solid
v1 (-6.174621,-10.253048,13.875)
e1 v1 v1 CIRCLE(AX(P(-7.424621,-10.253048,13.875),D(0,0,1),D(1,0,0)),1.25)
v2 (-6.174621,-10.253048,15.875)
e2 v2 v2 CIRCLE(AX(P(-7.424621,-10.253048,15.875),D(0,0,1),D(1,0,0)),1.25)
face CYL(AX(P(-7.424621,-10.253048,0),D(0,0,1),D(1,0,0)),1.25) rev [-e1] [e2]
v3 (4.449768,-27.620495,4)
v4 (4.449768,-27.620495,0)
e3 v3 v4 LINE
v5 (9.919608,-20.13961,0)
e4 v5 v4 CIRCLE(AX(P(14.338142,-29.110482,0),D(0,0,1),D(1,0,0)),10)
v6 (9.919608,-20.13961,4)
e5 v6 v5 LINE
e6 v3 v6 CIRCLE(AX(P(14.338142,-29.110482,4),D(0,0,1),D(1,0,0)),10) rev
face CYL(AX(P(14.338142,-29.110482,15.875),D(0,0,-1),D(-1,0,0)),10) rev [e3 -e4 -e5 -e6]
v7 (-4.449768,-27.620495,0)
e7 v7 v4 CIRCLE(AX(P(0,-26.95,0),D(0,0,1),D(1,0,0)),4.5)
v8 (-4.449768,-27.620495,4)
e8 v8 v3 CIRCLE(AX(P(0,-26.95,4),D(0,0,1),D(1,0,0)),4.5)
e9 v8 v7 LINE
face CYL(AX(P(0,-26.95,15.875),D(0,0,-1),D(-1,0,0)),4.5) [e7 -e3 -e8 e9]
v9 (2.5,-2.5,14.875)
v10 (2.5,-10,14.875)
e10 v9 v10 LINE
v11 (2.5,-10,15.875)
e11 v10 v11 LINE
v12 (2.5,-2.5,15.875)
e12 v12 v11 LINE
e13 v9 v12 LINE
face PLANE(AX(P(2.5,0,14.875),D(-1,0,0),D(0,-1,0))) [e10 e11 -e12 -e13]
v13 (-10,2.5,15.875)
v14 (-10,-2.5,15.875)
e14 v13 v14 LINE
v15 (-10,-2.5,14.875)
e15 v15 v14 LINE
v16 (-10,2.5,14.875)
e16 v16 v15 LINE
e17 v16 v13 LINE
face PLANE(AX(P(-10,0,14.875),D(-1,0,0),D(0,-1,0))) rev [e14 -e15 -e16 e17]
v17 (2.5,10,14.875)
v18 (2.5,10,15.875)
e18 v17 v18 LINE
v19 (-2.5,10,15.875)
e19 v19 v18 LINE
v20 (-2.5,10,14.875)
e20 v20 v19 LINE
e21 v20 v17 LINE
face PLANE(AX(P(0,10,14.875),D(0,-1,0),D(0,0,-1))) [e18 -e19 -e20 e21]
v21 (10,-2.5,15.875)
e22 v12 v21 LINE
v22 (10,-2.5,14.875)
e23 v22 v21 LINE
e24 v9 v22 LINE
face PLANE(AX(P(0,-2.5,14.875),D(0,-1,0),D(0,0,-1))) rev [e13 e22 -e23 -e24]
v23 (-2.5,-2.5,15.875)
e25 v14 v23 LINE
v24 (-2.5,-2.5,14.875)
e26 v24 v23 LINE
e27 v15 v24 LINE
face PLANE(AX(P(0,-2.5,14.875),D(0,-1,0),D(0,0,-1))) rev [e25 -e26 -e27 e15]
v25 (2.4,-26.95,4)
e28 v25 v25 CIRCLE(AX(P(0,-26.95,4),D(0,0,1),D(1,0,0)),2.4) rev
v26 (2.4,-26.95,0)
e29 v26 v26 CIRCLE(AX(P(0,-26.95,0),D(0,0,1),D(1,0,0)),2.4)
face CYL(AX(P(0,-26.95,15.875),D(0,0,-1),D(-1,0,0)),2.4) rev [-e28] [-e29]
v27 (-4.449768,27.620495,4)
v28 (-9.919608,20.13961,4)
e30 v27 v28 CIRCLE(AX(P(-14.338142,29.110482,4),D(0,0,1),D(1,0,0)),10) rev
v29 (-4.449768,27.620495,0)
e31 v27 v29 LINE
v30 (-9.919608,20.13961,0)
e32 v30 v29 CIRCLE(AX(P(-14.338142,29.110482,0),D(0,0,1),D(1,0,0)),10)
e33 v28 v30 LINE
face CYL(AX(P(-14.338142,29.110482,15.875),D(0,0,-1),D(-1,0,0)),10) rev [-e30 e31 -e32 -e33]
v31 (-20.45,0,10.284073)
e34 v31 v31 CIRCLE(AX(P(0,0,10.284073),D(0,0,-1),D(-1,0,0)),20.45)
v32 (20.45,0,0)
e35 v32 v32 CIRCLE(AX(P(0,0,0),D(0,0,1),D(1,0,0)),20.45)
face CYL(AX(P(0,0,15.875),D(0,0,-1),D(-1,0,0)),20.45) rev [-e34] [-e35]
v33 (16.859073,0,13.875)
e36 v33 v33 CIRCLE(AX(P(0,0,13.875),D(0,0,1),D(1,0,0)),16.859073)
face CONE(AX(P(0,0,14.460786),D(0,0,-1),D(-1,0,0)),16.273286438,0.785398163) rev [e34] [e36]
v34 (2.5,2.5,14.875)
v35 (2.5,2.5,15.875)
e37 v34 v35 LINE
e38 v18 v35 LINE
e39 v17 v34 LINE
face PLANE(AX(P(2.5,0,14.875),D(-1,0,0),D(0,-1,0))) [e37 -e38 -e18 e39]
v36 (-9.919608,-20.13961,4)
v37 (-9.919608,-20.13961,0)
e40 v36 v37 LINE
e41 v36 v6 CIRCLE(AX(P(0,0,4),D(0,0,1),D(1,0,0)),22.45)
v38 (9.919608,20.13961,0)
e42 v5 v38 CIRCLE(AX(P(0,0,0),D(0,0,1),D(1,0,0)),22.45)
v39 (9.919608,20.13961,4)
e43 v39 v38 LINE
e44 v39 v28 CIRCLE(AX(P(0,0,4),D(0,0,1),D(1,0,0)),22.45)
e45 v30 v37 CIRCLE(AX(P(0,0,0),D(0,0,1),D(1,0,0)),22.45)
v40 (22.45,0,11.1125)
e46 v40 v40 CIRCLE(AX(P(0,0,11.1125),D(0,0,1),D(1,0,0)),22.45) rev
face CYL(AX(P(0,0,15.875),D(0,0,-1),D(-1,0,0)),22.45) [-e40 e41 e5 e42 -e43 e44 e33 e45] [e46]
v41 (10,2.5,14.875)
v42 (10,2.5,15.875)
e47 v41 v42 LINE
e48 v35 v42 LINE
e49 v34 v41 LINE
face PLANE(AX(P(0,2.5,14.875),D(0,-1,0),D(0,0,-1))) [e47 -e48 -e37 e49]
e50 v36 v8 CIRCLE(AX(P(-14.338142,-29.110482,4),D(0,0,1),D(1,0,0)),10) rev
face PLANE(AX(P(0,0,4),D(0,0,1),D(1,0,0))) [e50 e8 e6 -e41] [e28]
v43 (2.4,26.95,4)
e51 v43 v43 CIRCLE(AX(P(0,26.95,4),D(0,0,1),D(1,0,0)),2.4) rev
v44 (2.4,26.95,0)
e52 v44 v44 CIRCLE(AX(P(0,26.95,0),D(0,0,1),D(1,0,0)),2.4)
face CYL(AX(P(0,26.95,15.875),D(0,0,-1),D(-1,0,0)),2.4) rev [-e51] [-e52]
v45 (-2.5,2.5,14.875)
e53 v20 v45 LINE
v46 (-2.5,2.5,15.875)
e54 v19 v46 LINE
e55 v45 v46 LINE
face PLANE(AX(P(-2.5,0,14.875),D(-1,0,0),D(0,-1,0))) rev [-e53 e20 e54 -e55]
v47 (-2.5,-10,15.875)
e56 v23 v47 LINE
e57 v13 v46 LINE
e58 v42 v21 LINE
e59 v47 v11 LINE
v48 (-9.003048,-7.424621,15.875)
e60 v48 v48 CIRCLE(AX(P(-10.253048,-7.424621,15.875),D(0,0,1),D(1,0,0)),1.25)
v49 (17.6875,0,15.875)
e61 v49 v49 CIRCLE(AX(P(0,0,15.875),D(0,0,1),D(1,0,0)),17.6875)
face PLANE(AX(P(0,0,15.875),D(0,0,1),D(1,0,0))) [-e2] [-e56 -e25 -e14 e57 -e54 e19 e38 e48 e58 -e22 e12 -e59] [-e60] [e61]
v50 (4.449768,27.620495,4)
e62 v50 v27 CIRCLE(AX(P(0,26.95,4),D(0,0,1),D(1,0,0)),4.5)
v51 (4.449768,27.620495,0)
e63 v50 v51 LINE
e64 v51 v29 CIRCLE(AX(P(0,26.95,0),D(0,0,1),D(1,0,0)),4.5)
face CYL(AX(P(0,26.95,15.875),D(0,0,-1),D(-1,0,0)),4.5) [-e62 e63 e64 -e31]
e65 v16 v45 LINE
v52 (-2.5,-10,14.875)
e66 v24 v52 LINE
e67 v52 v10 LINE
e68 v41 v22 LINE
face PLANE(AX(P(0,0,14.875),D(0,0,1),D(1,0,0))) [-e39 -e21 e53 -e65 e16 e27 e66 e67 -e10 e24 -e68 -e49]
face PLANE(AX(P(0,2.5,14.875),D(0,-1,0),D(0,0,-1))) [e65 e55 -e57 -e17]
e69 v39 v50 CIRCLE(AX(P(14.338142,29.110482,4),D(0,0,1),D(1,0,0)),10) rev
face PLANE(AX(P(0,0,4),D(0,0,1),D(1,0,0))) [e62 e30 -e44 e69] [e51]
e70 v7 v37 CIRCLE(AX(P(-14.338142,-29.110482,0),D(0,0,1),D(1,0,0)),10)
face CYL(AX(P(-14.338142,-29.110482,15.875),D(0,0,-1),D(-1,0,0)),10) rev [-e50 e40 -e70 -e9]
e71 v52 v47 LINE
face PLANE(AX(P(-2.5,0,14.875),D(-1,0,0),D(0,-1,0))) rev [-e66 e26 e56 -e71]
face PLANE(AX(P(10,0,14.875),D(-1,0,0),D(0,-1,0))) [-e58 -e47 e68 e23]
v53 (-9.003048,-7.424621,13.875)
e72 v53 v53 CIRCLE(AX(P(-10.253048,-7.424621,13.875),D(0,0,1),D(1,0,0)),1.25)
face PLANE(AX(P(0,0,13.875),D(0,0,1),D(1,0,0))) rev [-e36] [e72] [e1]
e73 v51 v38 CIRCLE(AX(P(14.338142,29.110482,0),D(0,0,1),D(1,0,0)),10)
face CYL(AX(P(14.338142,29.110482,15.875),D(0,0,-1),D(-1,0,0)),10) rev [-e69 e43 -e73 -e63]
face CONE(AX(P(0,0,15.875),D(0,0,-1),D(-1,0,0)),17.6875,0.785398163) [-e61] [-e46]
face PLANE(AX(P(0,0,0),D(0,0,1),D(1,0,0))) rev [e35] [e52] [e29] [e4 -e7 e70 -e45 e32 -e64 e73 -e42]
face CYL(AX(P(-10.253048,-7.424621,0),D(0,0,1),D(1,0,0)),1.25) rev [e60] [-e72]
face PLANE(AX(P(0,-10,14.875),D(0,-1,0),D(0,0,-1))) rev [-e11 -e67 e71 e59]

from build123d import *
from build123d.topology import SkipClean

# Parameters (mm, degrees)
SKETCH1_R           = 2.4
BOSS_EXTRUDE1_DEPTH = 15.875
CUT_EXTRUDE11_START = -11.875
SKETCH13_R          = 2.4
CUT_EXTRUDE11_DEPTH = 11.875
CHAMFER1_SIZE       = 4.7625
SHELL1_OUTLINE_R    = 20.45
SHELL1_DEPTH        = 10.284072775
SHELL1_2_DEPTH      = 2
BOSS_EXTRUDE2_START = 2
BOSS_EXTRUDE2_DEPTH = 2
SKETCH15_W          = 7.5
SKETCH15_H          = 5
SKETCH15_W_2        = 5
SKETCH15_H_2        = 7.5
CUT_EXTRUDE12_DEPTH = 1
SKETCH16_R          = 1.25
CUT_EXTRUDE13_DEPTH = 42.774640932


with BuildPart() as part:
    # Sketch1 → Boss-Extrude1 (new body)
    # profile 1 of 3: a face of its own
    with BuildSketch(Plane.XY):
        with BuildLine():
            ThreePointArc((9.919608253, -20.139609532), (13.072195817, -18.251580659), (15.874547238, -15.874547238))
            Line((15.874547238, -15.874547238), (14.460333675, -14.460333675))
            ThreePointArc((14.460333675, -14.460333675), (-14.460333675, -14.460333675), (-14.460333675, 14.460333675))
            Line((-14.460333675, 14.460333675), (-15.874547238, 15.874547238))
            ThreePointArc((-15.874547238, 15.874547238), (-22.149254758, -3.662378144), (-9.919608253, -20.139609532))
            ThreePointArc((-9.919608253, -20.139609532), (-6.265793461, -23.208178662), (-4.449768206, -27.62049453))
            ThreePointArc((-4.449768206, -27.62049453), (0, -31.45), (4.449768206, -27.62049453))
            ThreePointArc((4.449768206, -27.62049453), (6.265793461, -23.208178662), (9.919608253, -20.139609532))
        make_face()
        with Locations((0, -26.95)):
            Circle(SKETCH1_R, mode=Mode.SUBTRACT)
    # profile 2 of 3: a face of its own
    with BuildSketch(Plane.XY):
        with BuildLine():
            Line((14.460333675, -14.460333675), (15.874547238, -15.874547238))
            ThreePointArc((15.874547238, -15.874547238), (22.149254758, 3.662378144), (9.919608253, 20.139609532))
            ThreePointArc((9.919608253, 20.139609532), (6.265793461, 23.208178662), (4.449768206, 27.62049453))
            ThreePointArc((4.449768206, 27.62049453), (0, 31.45), (-4.449768206, 27.62049453))
            ThreePointArc((-4.449768206, 27.62049453), (-6.265793461, 23.208178662), (-9.919608253, 20.139609532))
            ThreePointArc((-9.919608253, 20.139609532), (-13.072195817, 18.251580659), (-15.874547238, 15.874547238))
            Line((-15.874547238, 15.874547238), (-14.460333675, 14.460333675))
            ThreePointArc((-14.460333675, 14.460333675), (14.460333675, 14.460333675), (14.460333675, -14.460333675))
        make_face()
        with Locations((0, 26.95)):
            Circle(SKETCH1_R, mode=Mode.SUBTRACT)
    # profile 3 of 3: a face of its own
    with BuildSketch(Plane.XY):
        with BuildLine():
            ThreePointArc((-14.460333675, 14.460333675), (-14.460333675, -14.460333675), (14.460333675, -14.460333675))
            ThreePointArc((14.460333675, -14.460333675), (14.460333675, 14.460333675), (-14.460333675, 14.460333675))
        make_face()
    extrude(amount=BOSS_EXTRUDE1_DEPTH)

    # Sketch13 → Cut-Extrude11 (cut)
    # profile 1 of 2: a face of its own
    with SkipClean():  # the faces are left unmerged after this step: merging them gives an invalid solid
        with BuildSketch(Plane.XY.offset(15.875).offset(CUT_EXTRUDE11_START)):
            with BuildLine():
                ThreePointArc((4.449768206, -27.62049453), (6.265793461, -23.208178662), (9.919608253, -20.139609532))
                ThreePointArc((9.919608253, -20.139609532), (0, -22.45), (-9.919608253, -20.139609532))
                ThreePointArc((-9.919608253, -20.139609532), (-6.265793461, -23.208178662), (-4.449768206, -27.62049453))
                ThreePointArc((-4.449768206, -27.62049453), (0, -31.45), (4.449768206, -27.62049453))
            make_face()
            with Locations((0, -26.95)):
                Circle(SKETCH13_R, mode=Mode.SUBTRACT)
        # profile 2 of 2: a face of its own
        with BuildSketch(Plane.XY.offset(15.875).offset(CUT_EXTRUDE11_START)):
            with BuildLine():
                ThreePointArc((-9.919608253, 20.139609532), (0, 22.45), (9.919608253, 20.139609532))
                ThreePointArc((9.919608253, 20.139609532), (6.265793461, 23.208178662), (4.449768206, 27.62049453))
                ThreePointArc((4.449768206, 27.62049453), (0, 31.45), (-4.449768206, 27.62049453))
                ThreePointArc((-4.449768206, 27.62049453), (-6.265793461, 23.208178662), (-9.919608253, 20.139609532))
            make_face()
            with Locations((0, 26.95)):
                Circle(SKETCH13_R, mode=Mode.SUBTRACT)
        extrude(amount=CUT_EXTRUDE11_DEPTH, mode=Mode.SUBTRACT)

    # Chamfer1
    chamfer1_edges = [part.edges().sort_by_distance(p)[0] for p in [
        (22.45, 0, 15.875),
    ]]
    chamfer(chamfer1_edges, length=CHAMFER1_SIZE)

    # Shell1: read off the stored shape, not the designer's step
    # Shell1 outline → Shell1 (cut)
    with SkipClean():  # the faces are left unmerged after this step: merging them gives an invalid solid
        with BuildSketch(Plane.XY):
            Circle(SHELL1_OUTLINE_R)
        extrude(amount=SHELL1_DEPTH, mode=Mode.SUBTRACT)

    # Shell1 2 outline → Shell1 2 (cut)
    with SkipClean():  # the faces are left unmerged after this step: merging them gives an invalid solid
        with BuildSketch(Plane.XY):
            with BuildLine():
                ThreePointArc((-3.405256243, -24.163563222), (0, -22.55), (3.405256243, -24.163563222))
                ThreePointArc((3.405256243, -24.163563222), (5.715063361, -20.765273279), (9.035901505, -18.345434963))
                ThreePointArc((9.035901505, -18.345434963), (0, -20.45), (-9.035901505, -18.345434963))
                ThreePointArc((-9.035901505, -18.345434963), (-5.715063361, -20.765273279), (-3.405256243, -24.163563222))
            make_face()
            with BuildLine():
                ThreePointArc((-3.405256243, 24.163563222), (-5.715063361, 20.765273279), (-9.035901505, 18.345434963))
                ThreePointArc((-9.035901505, 18.345434963), (0, 20.45), (9.035901505, 18.345434963))
                ThreePointArc((9.035901505, 18.345434963), (5.715063361, 20.765273279), (3.405256243, 24.163563222))
                ThreePointArc((3.405256243, 24.163563222), (0, 22.55), (-3.405256243, 24.163563222))
            make_face()
        extrude(amount=SHELL1_2_DEPTH, mode=Mode.SUBTRACT)

    # Shell1 3 outline → Shell1 3 (revolve, cut)
    with SkipClean():  # the faces are left unmerged after this step: merging them gives an invalid solid
        with BuildSketch(Plane.XZ):
            Polygon((16.859072875, 13.875), (0, 13.875), (0, 10.284072775), (20.45, 10.284072775), align=None)
        revolve(axis=Axis((0, 0, 0), (0, 0, 1)), mode=Mode.SUBTRACT)

    # Sketch14 → Boss-Extrude2 (add)
    with SkipClean():  # the faces are left unmerged after this step: merging them gives an invalid solid
        with BuildSketch(Plane(origin=(0, 0, 2), x_dir=(-1, 0, 0), z_dir=(0, 0, -1)).offset(BOSS_EXTRUDE2_START)):
            with BuildLine():
                ThreePointArc((-9.035901505, 18.345434963), (-5.715063361, 20.765273279), (-3.405256243, 24.163563222))
                ThreePointArc((-3.405256243, 24.163563222), (0, 22.55), (3.405256243, 24.163563222))
                ThreePointArc((3.405256243, 24.163563222), (5.715063361, 20.765273279), (9.035901505, 18.345434963))
                ThreePointArc((9.035901505, 18.345434963), (0, 20.45), (-9.035901505, 18.345434963))
            make_face()
            with BuildLine():
                ThreePointArc((9.035901505, -18.345434963), (5.715063361, -20.765273279), (3.405256243, -24.163563222))
                ThreePointArc((3.405256243, -24.163563222), (0, -22.55), (-3.405256243, -24.163563222))
                ThreePointArc((-3.405256243, -24.163563222), (-5.715063361, -20.765273279), (-9.035901505, -18.345434963))
                ThreePointArc((-9.035901505, -18.345434963), (0, -20.45), (9.035901505, -18.345434963))
            make_face()
        extrude(amount=-BOSS_EXTRUDE2_DEPTH)

    # Sketch15 → Cut-Extrude12 (cut)
    with SkipClean():  # the faces are left unmerged after this step: merging them gives an invalid solid
        with BuildSketch(Plane.XY.offset(15.875)):
            with Locations((-6.25, 0)):
                Rectangle(SKETCH15_W, SKETCH15_H)
            Rectangle(SKETCH15_W_2, SKETCH15_H)
            with Locations((6.25, 0)):
                Rectangle(SKETCH15_W, SKETCH15_H)
            with Locations((0, -6.25)):
                Rectangle(SKETCH15_W_2, SKETCH15_H_2)
            with Locations((0, 6.25)):
                Rectangle(SKETCH15_W_2, SKETCH15_H_2)
        extrude(amount=-CUT_EXTRUDE12_DEPTH, mode=Mode.SUBTRACT)

    # Sketch16 → Cut-Extrude13 (cut, through all)
    with SkipClean():  # the faces are left unmerged after this step: merging them gives an invalid solid
        with BuildSketch(Plane.XY.offset(15.875)):
            with Locations((-7.424621202, -10.253048327)):
                Circle(SKETCH16_R)
            with Locations((-10.253048327, -7.424621202)):
                Circle(SKETCH16_R)
        extrude(amount=-CUT_EXTRUDE13_DEPTH, mode=Mode.SUBTRACT)


solid = part.part
